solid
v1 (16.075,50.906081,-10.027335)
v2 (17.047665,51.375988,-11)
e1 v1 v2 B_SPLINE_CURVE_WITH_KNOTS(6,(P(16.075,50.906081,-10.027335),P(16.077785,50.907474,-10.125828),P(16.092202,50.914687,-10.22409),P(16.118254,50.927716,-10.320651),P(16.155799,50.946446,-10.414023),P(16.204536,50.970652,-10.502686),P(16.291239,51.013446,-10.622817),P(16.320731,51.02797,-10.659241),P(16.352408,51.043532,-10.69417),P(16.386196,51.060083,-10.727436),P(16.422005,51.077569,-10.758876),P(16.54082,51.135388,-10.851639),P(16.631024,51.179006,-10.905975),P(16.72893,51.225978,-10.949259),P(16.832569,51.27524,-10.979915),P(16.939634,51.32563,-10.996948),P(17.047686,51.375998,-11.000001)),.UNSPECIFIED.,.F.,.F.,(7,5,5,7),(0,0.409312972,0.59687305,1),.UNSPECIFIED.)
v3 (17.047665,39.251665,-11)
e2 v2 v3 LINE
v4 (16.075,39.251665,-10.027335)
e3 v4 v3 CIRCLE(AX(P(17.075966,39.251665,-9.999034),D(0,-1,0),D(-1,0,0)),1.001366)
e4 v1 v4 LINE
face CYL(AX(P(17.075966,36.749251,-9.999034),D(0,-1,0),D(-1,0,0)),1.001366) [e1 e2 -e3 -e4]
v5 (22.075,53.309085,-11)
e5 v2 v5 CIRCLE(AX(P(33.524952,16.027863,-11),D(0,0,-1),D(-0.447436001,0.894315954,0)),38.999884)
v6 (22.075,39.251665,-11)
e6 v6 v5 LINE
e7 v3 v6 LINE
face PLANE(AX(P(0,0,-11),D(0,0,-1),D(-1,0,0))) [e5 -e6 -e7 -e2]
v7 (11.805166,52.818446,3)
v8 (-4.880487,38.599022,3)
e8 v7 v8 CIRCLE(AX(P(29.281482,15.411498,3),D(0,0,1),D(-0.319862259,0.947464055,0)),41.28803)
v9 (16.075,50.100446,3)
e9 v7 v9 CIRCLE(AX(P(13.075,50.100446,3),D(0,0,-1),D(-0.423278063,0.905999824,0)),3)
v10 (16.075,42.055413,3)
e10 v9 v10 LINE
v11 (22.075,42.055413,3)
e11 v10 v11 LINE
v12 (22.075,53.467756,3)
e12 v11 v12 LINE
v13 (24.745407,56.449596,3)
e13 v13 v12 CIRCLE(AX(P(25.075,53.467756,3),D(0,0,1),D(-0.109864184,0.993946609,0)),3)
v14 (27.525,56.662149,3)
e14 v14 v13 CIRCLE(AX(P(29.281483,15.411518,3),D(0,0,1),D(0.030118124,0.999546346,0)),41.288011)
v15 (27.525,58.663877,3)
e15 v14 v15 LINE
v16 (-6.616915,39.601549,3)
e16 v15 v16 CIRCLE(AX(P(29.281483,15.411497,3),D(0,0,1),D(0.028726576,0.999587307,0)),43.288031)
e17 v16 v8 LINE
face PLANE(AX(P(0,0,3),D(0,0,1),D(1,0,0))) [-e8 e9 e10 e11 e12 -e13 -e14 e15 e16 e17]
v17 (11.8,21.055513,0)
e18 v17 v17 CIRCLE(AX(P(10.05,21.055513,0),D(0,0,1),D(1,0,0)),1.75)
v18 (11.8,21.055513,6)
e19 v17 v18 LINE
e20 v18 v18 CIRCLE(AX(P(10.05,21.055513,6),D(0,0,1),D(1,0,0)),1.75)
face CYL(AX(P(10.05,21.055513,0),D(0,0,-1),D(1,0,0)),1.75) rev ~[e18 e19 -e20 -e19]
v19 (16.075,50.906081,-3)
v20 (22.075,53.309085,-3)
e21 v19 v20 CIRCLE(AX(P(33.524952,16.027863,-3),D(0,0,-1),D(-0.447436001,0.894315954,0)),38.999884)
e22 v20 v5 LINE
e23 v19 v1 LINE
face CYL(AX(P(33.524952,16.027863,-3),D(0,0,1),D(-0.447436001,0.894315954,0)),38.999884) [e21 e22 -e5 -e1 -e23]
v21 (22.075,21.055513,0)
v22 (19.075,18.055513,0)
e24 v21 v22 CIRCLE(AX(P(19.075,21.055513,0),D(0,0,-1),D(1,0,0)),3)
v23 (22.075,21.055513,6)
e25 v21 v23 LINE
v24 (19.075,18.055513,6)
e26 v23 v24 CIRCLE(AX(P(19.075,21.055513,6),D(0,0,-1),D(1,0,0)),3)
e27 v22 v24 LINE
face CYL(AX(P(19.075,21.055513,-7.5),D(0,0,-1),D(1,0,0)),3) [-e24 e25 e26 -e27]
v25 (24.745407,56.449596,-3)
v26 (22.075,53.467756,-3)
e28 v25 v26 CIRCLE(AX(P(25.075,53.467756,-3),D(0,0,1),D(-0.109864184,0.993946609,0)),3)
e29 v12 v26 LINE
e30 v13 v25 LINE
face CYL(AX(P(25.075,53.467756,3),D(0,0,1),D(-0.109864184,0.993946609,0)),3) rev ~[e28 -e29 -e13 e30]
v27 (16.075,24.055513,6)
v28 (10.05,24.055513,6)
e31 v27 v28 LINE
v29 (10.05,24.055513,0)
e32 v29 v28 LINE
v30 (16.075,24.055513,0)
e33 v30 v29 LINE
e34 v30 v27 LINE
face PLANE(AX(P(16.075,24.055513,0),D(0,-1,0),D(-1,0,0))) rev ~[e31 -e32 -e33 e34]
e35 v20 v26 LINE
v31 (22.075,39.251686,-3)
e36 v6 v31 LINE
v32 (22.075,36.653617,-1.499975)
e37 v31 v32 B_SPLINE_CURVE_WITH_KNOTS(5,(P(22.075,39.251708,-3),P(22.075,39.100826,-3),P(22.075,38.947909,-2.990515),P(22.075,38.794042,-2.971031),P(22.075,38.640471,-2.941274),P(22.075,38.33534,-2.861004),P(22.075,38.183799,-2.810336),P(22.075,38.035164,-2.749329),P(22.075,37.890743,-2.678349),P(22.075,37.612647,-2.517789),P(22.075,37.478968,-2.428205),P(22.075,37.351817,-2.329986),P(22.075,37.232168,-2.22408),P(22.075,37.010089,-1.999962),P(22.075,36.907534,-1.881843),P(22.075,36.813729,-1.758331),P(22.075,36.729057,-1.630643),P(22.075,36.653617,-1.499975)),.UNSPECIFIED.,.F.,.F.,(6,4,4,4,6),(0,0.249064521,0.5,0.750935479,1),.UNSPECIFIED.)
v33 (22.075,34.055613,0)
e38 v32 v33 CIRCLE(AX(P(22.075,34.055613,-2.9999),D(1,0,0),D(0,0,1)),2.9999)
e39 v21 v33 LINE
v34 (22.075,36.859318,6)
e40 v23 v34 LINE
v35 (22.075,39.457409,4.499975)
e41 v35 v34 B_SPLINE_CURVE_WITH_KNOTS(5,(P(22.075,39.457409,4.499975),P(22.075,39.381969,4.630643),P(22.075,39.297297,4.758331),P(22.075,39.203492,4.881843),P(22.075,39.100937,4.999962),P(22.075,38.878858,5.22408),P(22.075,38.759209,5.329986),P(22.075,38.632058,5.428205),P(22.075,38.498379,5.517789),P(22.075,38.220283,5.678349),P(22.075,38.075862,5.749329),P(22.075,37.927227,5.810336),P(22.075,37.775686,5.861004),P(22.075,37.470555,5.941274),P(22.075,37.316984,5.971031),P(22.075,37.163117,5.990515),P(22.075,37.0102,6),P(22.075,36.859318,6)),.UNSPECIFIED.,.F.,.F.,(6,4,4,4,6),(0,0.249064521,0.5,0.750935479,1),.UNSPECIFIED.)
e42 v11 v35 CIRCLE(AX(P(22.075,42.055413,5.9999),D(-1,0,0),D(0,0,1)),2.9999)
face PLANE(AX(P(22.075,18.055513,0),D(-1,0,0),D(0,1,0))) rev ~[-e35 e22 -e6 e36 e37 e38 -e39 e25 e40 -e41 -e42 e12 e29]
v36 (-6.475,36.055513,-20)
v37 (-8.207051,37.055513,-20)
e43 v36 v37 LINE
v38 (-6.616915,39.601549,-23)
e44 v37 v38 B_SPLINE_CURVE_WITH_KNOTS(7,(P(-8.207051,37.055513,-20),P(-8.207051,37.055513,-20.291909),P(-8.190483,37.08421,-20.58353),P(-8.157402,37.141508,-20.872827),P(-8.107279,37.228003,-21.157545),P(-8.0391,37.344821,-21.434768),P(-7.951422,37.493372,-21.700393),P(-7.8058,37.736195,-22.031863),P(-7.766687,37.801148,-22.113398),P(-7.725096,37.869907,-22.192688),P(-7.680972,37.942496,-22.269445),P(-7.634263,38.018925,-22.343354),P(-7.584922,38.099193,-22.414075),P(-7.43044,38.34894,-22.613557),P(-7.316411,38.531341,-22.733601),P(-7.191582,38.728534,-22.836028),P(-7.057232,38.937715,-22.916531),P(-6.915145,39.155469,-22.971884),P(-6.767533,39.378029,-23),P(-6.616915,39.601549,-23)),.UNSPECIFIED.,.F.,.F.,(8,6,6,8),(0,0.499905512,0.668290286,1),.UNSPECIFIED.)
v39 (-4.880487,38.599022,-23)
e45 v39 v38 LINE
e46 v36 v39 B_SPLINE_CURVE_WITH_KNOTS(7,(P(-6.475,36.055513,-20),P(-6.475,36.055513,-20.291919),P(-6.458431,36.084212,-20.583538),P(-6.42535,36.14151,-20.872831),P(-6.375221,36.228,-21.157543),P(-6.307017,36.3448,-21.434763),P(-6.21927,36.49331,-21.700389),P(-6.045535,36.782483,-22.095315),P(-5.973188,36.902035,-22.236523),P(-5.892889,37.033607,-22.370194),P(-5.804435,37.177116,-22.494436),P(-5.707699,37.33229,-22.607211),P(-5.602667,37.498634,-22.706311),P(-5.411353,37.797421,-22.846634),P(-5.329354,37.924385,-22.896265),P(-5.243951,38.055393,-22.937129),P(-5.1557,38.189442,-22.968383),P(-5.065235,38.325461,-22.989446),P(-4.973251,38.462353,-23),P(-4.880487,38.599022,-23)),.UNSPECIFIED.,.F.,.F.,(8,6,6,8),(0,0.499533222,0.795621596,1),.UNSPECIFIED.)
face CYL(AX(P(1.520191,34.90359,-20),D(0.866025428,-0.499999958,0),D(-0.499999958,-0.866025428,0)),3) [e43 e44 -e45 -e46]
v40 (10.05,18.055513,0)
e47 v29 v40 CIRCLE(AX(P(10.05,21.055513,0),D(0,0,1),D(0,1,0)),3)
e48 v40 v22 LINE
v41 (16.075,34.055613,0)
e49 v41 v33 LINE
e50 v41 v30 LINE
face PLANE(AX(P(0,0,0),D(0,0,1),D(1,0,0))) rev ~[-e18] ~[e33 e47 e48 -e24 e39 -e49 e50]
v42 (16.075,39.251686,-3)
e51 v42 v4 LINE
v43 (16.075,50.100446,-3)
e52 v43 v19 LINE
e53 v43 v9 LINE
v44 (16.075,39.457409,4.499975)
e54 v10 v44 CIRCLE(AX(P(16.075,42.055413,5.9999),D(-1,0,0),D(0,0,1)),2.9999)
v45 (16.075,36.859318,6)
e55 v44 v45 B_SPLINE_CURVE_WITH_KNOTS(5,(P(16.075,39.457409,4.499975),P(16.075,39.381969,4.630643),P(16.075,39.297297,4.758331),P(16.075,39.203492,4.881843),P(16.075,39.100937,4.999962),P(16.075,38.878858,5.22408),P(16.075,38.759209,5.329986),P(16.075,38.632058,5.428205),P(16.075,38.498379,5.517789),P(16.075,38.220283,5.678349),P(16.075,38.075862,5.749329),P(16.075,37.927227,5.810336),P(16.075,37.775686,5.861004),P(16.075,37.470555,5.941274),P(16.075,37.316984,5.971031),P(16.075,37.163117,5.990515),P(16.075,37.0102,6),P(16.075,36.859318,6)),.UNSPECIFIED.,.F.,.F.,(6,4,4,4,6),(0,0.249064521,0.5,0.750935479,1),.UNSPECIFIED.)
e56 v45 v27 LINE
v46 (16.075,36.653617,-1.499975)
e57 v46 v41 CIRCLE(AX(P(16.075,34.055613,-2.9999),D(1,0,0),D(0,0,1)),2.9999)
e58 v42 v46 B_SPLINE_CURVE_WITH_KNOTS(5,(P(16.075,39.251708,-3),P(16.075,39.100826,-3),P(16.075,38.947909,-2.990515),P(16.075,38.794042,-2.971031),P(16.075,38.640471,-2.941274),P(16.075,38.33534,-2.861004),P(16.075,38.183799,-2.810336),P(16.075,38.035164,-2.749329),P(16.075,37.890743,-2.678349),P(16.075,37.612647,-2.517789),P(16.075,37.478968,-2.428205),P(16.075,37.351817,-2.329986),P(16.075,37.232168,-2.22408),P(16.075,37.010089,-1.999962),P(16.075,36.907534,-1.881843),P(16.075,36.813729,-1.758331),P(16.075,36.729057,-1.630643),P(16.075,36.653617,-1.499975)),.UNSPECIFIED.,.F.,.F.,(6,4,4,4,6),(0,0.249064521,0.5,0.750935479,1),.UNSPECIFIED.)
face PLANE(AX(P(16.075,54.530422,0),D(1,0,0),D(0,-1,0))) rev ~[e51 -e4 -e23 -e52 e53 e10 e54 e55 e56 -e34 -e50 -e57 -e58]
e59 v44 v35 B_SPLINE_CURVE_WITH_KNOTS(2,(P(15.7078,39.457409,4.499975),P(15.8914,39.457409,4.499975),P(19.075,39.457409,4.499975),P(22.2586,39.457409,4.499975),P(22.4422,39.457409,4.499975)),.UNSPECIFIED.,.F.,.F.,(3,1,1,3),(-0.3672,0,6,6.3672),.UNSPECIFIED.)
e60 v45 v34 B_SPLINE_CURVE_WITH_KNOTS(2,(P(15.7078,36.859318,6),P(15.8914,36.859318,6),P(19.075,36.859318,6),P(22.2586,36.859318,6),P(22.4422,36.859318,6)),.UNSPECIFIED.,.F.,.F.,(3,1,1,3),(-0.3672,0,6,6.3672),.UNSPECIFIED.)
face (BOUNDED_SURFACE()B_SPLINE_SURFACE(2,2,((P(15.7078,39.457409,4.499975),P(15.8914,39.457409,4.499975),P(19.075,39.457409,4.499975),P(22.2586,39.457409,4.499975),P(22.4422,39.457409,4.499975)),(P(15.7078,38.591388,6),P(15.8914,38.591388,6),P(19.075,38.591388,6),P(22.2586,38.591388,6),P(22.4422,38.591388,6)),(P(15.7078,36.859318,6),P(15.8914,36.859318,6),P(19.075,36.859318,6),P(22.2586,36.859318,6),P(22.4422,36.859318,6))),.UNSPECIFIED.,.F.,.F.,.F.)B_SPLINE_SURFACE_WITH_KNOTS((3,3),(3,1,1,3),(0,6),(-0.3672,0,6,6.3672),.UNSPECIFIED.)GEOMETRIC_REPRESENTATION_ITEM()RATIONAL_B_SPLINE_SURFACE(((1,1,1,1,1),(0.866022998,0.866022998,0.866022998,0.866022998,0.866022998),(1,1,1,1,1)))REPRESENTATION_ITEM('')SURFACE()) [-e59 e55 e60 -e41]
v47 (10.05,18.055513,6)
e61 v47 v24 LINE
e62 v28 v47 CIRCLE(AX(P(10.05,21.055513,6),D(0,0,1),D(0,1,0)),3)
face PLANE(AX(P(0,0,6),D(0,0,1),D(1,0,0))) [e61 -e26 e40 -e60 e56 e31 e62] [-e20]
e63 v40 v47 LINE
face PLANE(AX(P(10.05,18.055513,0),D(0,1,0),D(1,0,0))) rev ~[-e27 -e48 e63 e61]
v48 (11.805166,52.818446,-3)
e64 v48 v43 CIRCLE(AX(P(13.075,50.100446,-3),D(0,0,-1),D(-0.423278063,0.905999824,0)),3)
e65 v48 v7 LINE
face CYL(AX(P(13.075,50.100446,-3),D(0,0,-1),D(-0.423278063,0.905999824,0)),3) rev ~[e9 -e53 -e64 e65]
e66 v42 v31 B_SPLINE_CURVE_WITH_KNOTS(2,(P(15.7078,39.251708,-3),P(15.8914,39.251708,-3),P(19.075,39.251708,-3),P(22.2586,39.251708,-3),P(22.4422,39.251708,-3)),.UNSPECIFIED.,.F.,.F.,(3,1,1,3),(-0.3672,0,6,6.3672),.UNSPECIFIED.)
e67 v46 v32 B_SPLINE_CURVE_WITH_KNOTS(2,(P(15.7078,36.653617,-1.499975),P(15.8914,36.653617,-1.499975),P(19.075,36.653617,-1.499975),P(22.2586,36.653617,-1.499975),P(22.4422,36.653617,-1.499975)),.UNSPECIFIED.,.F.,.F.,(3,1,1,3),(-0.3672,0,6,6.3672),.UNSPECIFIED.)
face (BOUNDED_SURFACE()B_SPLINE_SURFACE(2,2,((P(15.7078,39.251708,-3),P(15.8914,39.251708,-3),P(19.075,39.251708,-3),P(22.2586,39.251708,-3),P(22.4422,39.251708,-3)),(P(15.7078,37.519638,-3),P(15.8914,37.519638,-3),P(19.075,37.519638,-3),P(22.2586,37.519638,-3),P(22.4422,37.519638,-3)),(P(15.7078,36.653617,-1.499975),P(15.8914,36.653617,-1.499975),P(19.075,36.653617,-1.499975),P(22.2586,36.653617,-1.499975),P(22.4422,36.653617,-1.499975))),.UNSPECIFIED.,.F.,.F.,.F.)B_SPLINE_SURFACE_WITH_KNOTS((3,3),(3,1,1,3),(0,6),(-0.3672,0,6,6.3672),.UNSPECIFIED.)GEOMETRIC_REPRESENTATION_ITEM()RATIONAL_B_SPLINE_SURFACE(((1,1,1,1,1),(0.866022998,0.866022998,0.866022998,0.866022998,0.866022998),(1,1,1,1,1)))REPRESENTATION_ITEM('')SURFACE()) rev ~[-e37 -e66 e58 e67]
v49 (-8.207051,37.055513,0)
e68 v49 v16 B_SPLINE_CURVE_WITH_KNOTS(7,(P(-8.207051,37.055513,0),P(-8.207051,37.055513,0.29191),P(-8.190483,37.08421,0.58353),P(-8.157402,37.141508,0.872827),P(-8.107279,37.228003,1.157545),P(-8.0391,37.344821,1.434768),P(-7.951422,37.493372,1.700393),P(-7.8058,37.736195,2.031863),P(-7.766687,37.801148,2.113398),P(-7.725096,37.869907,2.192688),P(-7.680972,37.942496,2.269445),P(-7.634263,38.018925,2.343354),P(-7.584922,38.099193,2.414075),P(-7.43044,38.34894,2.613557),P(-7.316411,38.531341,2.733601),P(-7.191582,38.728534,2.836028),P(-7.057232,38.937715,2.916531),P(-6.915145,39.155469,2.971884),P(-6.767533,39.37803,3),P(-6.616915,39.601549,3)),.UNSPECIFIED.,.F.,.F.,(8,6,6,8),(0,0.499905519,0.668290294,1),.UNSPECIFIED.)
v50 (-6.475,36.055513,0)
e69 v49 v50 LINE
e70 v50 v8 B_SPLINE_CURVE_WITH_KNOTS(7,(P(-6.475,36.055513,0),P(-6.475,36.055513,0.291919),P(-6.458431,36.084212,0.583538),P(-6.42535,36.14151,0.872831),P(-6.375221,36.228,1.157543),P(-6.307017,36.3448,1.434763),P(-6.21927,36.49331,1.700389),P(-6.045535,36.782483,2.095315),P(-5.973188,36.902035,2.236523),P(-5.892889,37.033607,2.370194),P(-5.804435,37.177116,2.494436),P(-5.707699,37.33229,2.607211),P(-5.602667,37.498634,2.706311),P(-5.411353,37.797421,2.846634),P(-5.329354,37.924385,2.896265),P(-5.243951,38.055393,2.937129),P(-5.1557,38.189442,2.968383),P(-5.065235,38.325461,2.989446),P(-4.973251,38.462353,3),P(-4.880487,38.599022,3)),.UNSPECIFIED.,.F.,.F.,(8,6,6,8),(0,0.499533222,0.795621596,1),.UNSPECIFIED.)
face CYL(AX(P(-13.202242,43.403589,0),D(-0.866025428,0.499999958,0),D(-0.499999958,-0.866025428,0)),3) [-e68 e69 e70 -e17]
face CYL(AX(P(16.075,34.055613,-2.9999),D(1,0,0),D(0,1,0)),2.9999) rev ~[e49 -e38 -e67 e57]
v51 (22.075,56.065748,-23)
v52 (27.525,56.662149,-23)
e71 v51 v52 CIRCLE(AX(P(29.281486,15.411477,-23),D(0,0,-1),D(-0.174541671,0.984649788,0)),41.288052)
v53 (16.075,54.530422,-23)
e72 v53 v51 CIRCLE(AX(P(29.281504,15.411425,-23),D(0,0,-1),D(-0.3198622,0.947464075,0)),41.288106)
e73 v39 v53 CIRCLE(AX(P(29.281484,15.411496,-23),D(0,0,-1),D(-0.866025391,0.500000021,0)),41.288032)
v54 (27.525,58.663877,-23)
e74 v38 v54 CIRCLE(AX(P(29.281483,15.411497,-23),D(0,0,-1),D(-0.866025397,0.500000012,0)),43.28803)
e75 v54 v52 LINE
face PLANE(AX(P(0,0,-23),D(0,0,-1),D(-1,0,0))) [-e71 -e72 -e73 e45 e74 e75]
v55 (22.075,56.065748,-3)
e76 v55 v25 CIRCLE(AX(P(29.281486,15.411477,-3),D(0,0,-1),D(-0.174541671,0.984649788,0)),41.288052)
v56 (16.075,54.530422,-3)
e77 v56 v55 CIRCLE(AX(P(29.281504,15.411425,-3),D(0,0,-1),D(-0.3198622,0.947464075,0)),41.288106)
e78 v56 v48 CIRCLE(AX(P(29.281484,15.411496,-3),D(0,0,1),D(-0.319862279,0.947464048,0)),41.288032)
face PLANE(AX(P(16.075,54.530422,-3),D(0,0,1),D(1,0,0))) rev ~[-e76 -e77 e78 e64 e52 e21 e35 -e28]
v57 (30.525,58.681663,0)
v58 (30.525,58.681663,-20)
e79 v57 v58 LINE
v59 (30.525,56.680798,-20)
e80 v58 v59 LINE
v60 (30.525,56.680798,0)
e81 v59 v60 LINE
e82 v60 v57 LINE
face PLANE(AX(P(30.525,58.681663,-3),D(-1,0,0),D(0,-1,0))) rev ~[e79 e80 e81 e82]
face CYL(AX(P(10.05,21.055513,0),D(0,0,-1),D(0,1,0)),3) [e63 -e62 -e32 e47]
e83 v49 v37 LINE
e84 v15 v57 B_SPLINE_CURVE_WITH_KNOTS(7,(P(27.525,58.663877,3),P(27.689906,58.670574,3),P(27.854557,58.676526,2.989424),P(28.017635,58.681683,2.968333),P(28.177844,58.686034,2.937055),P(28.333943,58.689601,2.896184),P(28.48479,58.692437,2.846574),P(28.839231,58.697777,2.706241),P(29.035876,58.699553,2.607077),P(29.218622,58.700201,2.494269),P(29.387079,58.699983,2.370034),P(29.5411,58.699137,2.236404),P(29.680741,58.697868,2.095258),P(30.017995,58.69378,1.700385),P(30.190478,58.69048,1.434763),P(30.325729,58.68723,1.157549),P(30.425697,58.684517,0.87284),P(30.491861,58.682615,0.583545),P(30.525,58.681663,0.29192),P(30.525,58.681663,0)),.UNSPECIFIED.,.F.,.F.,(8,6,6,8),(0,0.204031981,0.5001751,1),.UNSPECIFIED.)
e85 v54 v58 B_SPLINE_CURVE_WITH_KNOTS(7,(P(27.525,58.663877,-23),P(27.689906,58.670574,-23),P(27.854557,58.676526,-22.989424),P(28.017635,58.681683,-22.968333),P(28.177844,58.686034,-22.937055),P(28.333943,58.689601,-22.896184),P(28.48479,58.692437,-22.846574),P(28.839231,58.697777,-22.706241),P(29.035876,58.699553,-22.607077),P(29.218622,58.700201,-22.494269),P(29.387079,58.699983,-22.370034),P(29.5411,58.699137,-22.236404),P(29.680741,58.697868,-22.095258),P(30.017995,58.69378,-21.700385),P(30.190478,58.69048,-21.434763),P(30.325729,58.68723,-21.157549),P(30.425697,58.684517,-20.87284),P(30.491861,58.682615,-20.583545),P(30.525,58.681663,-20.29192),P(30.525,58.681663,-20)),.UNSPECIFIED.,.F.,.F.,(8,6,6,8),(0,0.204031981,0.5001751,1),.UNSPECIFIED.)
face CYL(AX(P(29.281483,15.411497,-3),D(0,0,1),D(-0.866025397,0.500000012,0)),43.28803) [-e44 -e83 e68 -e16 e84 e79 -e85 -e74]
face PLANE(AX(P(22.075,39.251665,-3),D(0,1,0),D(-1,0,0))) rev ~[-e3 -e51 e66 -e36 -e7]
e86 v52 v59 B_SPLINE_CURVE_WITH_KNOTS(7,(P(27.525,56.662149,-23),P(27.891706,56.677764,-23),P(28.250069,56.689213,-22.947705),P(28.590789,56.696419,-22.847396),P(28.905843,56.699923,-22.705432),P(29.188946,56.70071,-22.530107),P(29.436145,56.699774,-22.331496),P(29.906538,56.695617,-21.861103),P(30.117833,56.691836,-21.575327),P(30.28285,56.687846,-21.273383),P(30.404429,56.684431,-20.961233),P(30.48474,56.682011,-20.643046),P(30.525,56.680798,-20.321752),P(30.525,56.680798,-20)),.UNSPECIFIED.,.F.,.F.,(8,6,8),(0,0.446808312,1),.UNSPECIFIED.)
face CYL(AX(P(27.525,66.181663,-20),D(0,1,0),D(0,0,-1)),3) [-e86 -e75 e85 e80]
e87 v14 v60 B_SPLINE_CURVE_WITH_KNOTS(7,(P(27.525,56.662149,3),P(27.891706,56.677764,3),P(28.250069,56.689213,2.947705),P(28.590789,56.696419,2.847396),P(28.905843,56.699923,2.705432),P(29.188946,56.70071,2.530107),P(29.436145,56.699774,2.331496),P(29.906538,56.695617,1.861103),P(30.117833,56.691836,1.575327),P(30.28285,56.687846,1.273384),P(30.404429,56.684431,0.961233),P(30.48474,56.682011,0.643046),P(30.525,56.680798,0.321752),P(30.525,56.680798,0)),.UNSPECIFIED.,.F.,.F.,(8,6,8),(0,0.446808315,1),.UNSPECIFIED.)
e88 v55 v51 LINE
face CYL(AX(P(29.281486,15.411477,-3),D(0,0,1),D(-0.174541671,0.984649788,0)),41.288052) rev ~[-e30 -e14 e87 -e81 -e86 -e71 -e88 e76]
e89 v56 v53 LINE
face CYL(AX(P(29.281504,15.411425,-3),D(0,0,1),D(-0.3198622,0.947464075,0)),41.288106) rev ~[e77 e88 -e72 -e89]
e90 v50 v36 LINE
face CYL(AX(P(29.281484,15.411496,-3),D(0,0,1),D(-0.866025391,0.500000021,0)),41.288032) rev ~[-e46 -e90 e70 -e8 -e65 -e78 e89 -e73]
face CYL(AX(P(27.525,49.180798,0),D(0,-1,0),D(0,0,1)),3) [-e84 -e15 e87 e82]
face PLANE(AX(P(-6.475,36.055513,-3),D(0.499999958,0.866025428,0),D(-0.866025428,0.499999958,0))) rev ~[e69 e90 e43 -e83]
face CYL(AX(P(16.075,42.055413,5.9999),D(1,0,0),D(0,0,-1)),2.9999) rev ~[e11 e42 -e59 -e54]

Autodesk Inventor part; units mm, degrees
ref_plane "YZ Plane" through (0, 0, 0) normal (1, 0, 0) x (0, 1, 0)
ref_plane "XY Plane" through (0, 0, 0) normal (0, 0, 1) x (1, 0, 0)
sketch "Sketch1" plane through (0, 0, 0) normal (0, 0, 1) x (1, 0, 0)
  circle A0 centre (10.05, 11) radius 1.75
  arc A1 (13.575, 6.828427) -> (12.575, 7) centre (12.575, 4) ccw
  line L0 (13.575, 25.055513) -> (13.575, 6.828427)
  arc A2 (13.582607, 25.229787) -> (13.575, 25.055513) centre (15.575, 25.055513) ccw
  arc A3 (12.575, 25.055513) -> (13.582607, 25.229787) centre (12.575, 28.055513) ccw
  line L1 (7.525, 25.055513) -> (12.575, 25.055513)
  arc A4 (6.525, 25.227086) -> (7.525, 25.055513) centre (7.525, 28.055513) ccw
  line L2 (6.525, 6.828427) -> (6.525, 25.227086)
  arc A5 (7.525, 7) -> (6.525, 6.828427) centre (7.525, 4) ccw
  line L3 (12.575, 7) -> (7.525, 7)
  circle A6 centre (10.05, 21.055513) radius 1.75
  line L4 (10.05, 18.055513) -> (22.075, 18.055513)
  line L5 (22.075, 18.055513) -> (22.075, 56.065748)
  circle A7 centre (18.075, 30.055513) radius 1.75
  circle A8 centre (59, 30.055513) radius 1.75
  circle A9 centre (50.975, 2) radius 1.75
  circle A10 centre (10.05, 2) radius 1.75
  line L6 (3.525, -2) -> (3.525, 34.055513)
  arc A11 (3.525, -2) -> (63.525, -2) centre (33.525, 16.027756) ccw
  line L7 (63.525, 34.055513) -> (63.525, -2)
  arc A12 (63.525, 34.055513) -> (3.525, 34.055513) centre (33.525, 16.027756) ccw
  arc A13 (30.525, 56.680798) -> (-6.475, 36.055513) centre (29.281483, 15.411497) ccw
  arc A14 (30.525, 58.681663) -> (-8.207051, 37.055513) centre (29.281483, 15.411497) ccw
  line L8 (16.075, 54.530422) -> (16.075, 24.055513)
  line L9 (16.075, 24.055513) -> (10.05, 24.055513)
  arc A15 (10.05, 24.055513) -> (10.05, 18.055513) centre (10.05, 21.055513) ccw
  line L10 (-6.475, 36.055513) -> (-8.207051, 37.055513)
  line L11 (30.525, 56.680798) -> (30.525, 58.681663)
  line L12 (15.575, 28.055513) -> (15.575, 32.055513)
  point P0 (0, 0)
  point P1 (30.525, 57.681231)
  dimension "d0" = 6
  dimension "d1" = 6
  dimension "d2" = 3
  dimension "d3" = 2
  dimension "d4" = 2
  dimension "d5" = 0.5
  dimension "d6" = 60
  dimension "d22" = 10
  dimension "d23" = 2
sketch "Sketch1 outline for Extrusion1" plane through (0, 0, 0) normal (0, 0, 1) x (1, 0, 0)
  arc A0 (-6.475, 36.055513) -> (16.075, 54.530422) centre (29.281483, 15.411497) cw
  line L0 (16.075, 54.530422) -> (16.075, 24.055513)
  line L1 (16.075, 24.055513) -> (10.05, 24.055513)
  arc A1 (10.05, 24.055513) -> (10.05, 18.055513) centre (10.05, 21.055513) ccw
  line L2 (10.05, 18.055513) -> (22.075, 18.055513)
  line L3 (22.075, 18.055513) -> (22.075, 56.065748)
  arc A2 (22.075, 56.065748) -> (30.525, 56.680798) centre (29.281483, 15.411497) cw
  line L4 (30.525, 56.680798) -> (30.525, 58.681663)
  arc A3 (30.525, 58.681663) -> (-8.207051, 37.055513) centre (29.281483, 15.411497) ccw
  line L5 (-8.207051, 37.055513) -> (-6.475, 36.055513)
  circle A4 centre (10.05, 21.055513) radius 1.75
extrude "Extrusion1" add sketch "Sketch1 outline for Extrusion1" along normal blind 6
sketch "Sketch2" plane through (0, 0, 0) normal (0, 0, -1) x (-1, 0, 0)
  circle A0 centre (-10.05, 21.055513) radius 1.75
  arc A1 (6.475, 36.055513) -> (-16.075, 54.530422) centre (-29.281483, 15.411497) ccw
  line L0 (8.207051, 37.055513) -> (6.475, 36.055513)
  arc A2 (8.207051, 37.055513) -> (-30.525, 58.681663) centre (-29.281483, 15.411497) ccw
  line L1 (-30.525, 56.680798) -> (-30.525, 58.681663)
  arc A3 (-22.075, 56.065748) -> (-30.525, 56.680798) centre (-29.281483, 15.411497) ccw
  line L2 (-22.075, 18.055513) -> (-22.075, 56.065748)
  line L3 (-10.05, 18.055513) -> (-22.075, 18.055513)
  arc A4 (-10.05, 18.055513) -> (-10.05, 24.055513) centre (-10.05, 21.055513) ccw
  line L4 (-16.075, 24.055513) -> (-10.05, 24.055513)
  line L5 (-16.075, 54.530422) -> (-16.075, 24.055513)
  line L6 (-16.075, 54.530422) -> (-16.075, 24.055513)
  line L7 (-10.05, 18.055513) -> (-22.075, 18.055513)
  line L8 (-19.575, 34.055513) -> (-12.575, 34.055513)
  line L9 (-22.075, 18.055513) -> (-22.075, 56.065748)
  line L10 (-16.075, 37.055513) -> (-22.075, 37.055513)
  line L11 (-22.075, 18.055513) -> (-22.075, 56.065748)
  line L12 (-16.075, 37.055513) -> (-16.075, 54.530422)
  line L13 (-22.075, 37.055513) -> (-22.075, 56.065748)
  point P0 (0, 0)
  point P1 (-16.0625, 18.055513)
  dimension "d20" = 3
extrude "Extrusion2" add sketch "Sketch2" along normal blind 3 contours A1 L5 L10 L2 A3 L1 A2 L0
sketch "Sketch3" plane through (0, 0, 6) normal (0, 0, 1) x (1, 0, 0)
  line L0 (10.05, 18.055513) -> (22.075, 18.055513)
  line L1 (22.075, 18.055513) -> (22.075, 56.065748)
  arc A0 (30.525, 56.680798) -> (22.075, 56.065748) centre (29.281483, 15.411497) ccw
  line L2 (30.525, 56.680798) -> (30.525, 58.681663)
  arc A1 (30.525, 58.681663) -> (-8.207051, 37.055513) centre (29.281483, 15.411497) ccw
  line L3 (-8.207051, 37.055513) -> (-6.475, 36.055513)
  arc A2 (16.075, 54.530422) -> (-6.475, 36.055513) centre (29.281483, 15.411497) ccw
  line L4 (16.075, 54.530422) -> (16.075, 24.055513)
  line L5 (16.075, 24.055513) -> (10.05, 24.055513)
  arc A3 (10.05, 24.055513) -> (10.05, 18.055513) centre (10.05, 21.055513) ccw
  circle A4 centre (10.05, 21.055513) radius 1.75
  line L6 (5.525, 34.055513) -> (19.575, 34.055513)
  line L7 (16.075, 54.530422) -> (16.075, 24.055513)
  line L8 (22.075, 56.065748) -> (22.075, 18.055513)
  line L9 (16.075, 24.055513) -> (16.075, 54.530422)
  line L10 (16.075, 39.055513) -> (22.075, 39.055513)
  point P0 (0, 0)
  point P1 (22.075, 24.055513)
  point P2 (22.075, 34.055513)
  dimension "d19" = 5
extrude "Extrusion3" cut sketch "Sketch3" against normal blind 3 contours L10 L4 A2 L3 A1 L2 A0 L1
sketch "Sketch4" plane through (0, 0, -3) normal (0, 0, -1) x (-1, 0, 0)
  arc A0 (6.475, 36.055513) -> (-16.075, 54.530422) centre (-29.281483, 15.411497) ccw
  line L0 (6.475, 36.055513) -> (8.207051, 37.055513)
  arc A1 (8.207051, 37.055513) -> (-30.525, 58.681663) centre (-29.281483, 15.411497) ccw
  line L1 (-30.525, 58.681663) -> (-30.525, 56.680798)
  arc A2 (-22.075, 56.065748) -> (-30.525, 56.680798) centre (-29.281483, 15.411497) ccw
  arc A3 (-16.075, 54.530422) -> (-22.075, 56.065748) centre (-29.281486, 15.411487) ccw
  arc A4 (-22.075, 56.065748) -> (-30.525, 56.680798) centre (-29.281483, 15.411497) ccw
  line L2 (-22.075, 56.065748) -> (-22.075, 37.055513)
  line L3 (-22.075, 37.055513) -> (-16.075, 37.055513)
  line L4 (-16.075, 37.055513) -> (-16.075, 54.530422)
  point P0 (0, 0)
extrude "Extrusion4" add sketch "Sketch4" along normal blind 20 contours A0 A3 A2 L1 A1 L0
fillet "Fillet1" radius 3 7 edges at (16.075, 54.5304, 0) (22.075, 56.0657, 0) (22.075, 18.0555, 3) (-7.341, 36.5555, 3) (-7.341, 36.5555, -23) (30.525, 57.6812, -23) (30.525, 57.6812, 3)
fillet "Fillet2" radius 3 4 edges at (19.075, 39.0555, 3) (19.075, 39.0555, 6) (19.075, 37.0555, -3) (19.075, 37.0555, 0)
ref_plane "Work Plane1" through (29.281483, 58.699528, 0) normal (0, 1, 0) x (-1, 0, 0)
sketch "Sketch6" plane through (0, 0, -3) normal (0, 0, -1) x (-1, 0, 0)
  line L0 (-16.075, 39.251665) -> (-22.075, 39.251665)
  line L1 (-16.075, 39.251665) -> (-16.075, 50.100446)
  arc A0 (-11.805166, 52.818446) -> (-16.075, 50.100446) centre (-13.075, 50.100446) ccw
  arc A1 (-16.075, 54.530422) -> (-22.075, 56.065748) centre (-29.281486, 15.411487) ccw
  arc A2 (-22.075, 53.467756) -> (-24.745407, 56.449595) centre (-25.075, 53.467756) ccw
  line L2 (-22.075, 53.467756) -> (-22.075, 39.251665)
  arc A3 (-3.525, 34.055513) -> (-63.525, 34.055513) centre (-33.525, 16.027756) ccw
  arc A4 (-16.075, 48.654394) -> (-22.075, 51.211524) centre (-33.525, 16.027756) ccw
  line L3 (-22.075, 53.467756) -> (-22.075, 42.055513)
  arc A5 (-16.075, 50.906081) -> (-22.075, 53.309085) centre (-33.525, 16.027756) ccw
  line L4 (-22.075, 51.211524) -> (-22.075, 53.309085)
  line L5 (-16.075, 50.906081) -> (-16.075, 48.654394)
  line L6 (-16.075, 39.251665) -> (-16.075, 50.100446)
  line L7 (-16.075, 42.055513) -> (-16.075, 50.100446)
  line L8 (-16.075, 50.100446) -> (-22.075, 53.309085)
  arc A6 (-11.805166, 52.818446) -> (-16.075, 54.530422) centre (-29.281483, 15.411497) ccw
  arc A7 (-22.075, 56.065748) -> (-24.745407, 56.449595) centre (-29.281483, 15.411497) ccw
  point P0 (0, 0)
  dimension "d37" = 2
  dimension "d38" = 2
sketch "Sketch6 outline for Extrusion7" plane through (0, 0, -3) normal (0, 0, -1) x (-1, 0, 0)
  arc A0 (-16.075, 50.906081) -> (-22.075, 53.309085) centre (-33.525, 16.027756) ccw
  line L0 (-22.075, 53.309085) -> (-22.075, 39.251665)
  line L1 (-22.075, 39.251665) -> (-16.075, 39.251665)
  line L2 (-16.075, 39.251665) -> (-16.075, 50.906081)
extrude "Extrusion7" add sketch "Sketch6 outline for Extrusion7" along normal blind 8
fillet "Fillet6" radius 1 2 edges at (16.075, 45.0789, -11) (22.075, 46.2804, -11)
equation "\"d1\" = d0"
properties part number "obstacle bumper"
